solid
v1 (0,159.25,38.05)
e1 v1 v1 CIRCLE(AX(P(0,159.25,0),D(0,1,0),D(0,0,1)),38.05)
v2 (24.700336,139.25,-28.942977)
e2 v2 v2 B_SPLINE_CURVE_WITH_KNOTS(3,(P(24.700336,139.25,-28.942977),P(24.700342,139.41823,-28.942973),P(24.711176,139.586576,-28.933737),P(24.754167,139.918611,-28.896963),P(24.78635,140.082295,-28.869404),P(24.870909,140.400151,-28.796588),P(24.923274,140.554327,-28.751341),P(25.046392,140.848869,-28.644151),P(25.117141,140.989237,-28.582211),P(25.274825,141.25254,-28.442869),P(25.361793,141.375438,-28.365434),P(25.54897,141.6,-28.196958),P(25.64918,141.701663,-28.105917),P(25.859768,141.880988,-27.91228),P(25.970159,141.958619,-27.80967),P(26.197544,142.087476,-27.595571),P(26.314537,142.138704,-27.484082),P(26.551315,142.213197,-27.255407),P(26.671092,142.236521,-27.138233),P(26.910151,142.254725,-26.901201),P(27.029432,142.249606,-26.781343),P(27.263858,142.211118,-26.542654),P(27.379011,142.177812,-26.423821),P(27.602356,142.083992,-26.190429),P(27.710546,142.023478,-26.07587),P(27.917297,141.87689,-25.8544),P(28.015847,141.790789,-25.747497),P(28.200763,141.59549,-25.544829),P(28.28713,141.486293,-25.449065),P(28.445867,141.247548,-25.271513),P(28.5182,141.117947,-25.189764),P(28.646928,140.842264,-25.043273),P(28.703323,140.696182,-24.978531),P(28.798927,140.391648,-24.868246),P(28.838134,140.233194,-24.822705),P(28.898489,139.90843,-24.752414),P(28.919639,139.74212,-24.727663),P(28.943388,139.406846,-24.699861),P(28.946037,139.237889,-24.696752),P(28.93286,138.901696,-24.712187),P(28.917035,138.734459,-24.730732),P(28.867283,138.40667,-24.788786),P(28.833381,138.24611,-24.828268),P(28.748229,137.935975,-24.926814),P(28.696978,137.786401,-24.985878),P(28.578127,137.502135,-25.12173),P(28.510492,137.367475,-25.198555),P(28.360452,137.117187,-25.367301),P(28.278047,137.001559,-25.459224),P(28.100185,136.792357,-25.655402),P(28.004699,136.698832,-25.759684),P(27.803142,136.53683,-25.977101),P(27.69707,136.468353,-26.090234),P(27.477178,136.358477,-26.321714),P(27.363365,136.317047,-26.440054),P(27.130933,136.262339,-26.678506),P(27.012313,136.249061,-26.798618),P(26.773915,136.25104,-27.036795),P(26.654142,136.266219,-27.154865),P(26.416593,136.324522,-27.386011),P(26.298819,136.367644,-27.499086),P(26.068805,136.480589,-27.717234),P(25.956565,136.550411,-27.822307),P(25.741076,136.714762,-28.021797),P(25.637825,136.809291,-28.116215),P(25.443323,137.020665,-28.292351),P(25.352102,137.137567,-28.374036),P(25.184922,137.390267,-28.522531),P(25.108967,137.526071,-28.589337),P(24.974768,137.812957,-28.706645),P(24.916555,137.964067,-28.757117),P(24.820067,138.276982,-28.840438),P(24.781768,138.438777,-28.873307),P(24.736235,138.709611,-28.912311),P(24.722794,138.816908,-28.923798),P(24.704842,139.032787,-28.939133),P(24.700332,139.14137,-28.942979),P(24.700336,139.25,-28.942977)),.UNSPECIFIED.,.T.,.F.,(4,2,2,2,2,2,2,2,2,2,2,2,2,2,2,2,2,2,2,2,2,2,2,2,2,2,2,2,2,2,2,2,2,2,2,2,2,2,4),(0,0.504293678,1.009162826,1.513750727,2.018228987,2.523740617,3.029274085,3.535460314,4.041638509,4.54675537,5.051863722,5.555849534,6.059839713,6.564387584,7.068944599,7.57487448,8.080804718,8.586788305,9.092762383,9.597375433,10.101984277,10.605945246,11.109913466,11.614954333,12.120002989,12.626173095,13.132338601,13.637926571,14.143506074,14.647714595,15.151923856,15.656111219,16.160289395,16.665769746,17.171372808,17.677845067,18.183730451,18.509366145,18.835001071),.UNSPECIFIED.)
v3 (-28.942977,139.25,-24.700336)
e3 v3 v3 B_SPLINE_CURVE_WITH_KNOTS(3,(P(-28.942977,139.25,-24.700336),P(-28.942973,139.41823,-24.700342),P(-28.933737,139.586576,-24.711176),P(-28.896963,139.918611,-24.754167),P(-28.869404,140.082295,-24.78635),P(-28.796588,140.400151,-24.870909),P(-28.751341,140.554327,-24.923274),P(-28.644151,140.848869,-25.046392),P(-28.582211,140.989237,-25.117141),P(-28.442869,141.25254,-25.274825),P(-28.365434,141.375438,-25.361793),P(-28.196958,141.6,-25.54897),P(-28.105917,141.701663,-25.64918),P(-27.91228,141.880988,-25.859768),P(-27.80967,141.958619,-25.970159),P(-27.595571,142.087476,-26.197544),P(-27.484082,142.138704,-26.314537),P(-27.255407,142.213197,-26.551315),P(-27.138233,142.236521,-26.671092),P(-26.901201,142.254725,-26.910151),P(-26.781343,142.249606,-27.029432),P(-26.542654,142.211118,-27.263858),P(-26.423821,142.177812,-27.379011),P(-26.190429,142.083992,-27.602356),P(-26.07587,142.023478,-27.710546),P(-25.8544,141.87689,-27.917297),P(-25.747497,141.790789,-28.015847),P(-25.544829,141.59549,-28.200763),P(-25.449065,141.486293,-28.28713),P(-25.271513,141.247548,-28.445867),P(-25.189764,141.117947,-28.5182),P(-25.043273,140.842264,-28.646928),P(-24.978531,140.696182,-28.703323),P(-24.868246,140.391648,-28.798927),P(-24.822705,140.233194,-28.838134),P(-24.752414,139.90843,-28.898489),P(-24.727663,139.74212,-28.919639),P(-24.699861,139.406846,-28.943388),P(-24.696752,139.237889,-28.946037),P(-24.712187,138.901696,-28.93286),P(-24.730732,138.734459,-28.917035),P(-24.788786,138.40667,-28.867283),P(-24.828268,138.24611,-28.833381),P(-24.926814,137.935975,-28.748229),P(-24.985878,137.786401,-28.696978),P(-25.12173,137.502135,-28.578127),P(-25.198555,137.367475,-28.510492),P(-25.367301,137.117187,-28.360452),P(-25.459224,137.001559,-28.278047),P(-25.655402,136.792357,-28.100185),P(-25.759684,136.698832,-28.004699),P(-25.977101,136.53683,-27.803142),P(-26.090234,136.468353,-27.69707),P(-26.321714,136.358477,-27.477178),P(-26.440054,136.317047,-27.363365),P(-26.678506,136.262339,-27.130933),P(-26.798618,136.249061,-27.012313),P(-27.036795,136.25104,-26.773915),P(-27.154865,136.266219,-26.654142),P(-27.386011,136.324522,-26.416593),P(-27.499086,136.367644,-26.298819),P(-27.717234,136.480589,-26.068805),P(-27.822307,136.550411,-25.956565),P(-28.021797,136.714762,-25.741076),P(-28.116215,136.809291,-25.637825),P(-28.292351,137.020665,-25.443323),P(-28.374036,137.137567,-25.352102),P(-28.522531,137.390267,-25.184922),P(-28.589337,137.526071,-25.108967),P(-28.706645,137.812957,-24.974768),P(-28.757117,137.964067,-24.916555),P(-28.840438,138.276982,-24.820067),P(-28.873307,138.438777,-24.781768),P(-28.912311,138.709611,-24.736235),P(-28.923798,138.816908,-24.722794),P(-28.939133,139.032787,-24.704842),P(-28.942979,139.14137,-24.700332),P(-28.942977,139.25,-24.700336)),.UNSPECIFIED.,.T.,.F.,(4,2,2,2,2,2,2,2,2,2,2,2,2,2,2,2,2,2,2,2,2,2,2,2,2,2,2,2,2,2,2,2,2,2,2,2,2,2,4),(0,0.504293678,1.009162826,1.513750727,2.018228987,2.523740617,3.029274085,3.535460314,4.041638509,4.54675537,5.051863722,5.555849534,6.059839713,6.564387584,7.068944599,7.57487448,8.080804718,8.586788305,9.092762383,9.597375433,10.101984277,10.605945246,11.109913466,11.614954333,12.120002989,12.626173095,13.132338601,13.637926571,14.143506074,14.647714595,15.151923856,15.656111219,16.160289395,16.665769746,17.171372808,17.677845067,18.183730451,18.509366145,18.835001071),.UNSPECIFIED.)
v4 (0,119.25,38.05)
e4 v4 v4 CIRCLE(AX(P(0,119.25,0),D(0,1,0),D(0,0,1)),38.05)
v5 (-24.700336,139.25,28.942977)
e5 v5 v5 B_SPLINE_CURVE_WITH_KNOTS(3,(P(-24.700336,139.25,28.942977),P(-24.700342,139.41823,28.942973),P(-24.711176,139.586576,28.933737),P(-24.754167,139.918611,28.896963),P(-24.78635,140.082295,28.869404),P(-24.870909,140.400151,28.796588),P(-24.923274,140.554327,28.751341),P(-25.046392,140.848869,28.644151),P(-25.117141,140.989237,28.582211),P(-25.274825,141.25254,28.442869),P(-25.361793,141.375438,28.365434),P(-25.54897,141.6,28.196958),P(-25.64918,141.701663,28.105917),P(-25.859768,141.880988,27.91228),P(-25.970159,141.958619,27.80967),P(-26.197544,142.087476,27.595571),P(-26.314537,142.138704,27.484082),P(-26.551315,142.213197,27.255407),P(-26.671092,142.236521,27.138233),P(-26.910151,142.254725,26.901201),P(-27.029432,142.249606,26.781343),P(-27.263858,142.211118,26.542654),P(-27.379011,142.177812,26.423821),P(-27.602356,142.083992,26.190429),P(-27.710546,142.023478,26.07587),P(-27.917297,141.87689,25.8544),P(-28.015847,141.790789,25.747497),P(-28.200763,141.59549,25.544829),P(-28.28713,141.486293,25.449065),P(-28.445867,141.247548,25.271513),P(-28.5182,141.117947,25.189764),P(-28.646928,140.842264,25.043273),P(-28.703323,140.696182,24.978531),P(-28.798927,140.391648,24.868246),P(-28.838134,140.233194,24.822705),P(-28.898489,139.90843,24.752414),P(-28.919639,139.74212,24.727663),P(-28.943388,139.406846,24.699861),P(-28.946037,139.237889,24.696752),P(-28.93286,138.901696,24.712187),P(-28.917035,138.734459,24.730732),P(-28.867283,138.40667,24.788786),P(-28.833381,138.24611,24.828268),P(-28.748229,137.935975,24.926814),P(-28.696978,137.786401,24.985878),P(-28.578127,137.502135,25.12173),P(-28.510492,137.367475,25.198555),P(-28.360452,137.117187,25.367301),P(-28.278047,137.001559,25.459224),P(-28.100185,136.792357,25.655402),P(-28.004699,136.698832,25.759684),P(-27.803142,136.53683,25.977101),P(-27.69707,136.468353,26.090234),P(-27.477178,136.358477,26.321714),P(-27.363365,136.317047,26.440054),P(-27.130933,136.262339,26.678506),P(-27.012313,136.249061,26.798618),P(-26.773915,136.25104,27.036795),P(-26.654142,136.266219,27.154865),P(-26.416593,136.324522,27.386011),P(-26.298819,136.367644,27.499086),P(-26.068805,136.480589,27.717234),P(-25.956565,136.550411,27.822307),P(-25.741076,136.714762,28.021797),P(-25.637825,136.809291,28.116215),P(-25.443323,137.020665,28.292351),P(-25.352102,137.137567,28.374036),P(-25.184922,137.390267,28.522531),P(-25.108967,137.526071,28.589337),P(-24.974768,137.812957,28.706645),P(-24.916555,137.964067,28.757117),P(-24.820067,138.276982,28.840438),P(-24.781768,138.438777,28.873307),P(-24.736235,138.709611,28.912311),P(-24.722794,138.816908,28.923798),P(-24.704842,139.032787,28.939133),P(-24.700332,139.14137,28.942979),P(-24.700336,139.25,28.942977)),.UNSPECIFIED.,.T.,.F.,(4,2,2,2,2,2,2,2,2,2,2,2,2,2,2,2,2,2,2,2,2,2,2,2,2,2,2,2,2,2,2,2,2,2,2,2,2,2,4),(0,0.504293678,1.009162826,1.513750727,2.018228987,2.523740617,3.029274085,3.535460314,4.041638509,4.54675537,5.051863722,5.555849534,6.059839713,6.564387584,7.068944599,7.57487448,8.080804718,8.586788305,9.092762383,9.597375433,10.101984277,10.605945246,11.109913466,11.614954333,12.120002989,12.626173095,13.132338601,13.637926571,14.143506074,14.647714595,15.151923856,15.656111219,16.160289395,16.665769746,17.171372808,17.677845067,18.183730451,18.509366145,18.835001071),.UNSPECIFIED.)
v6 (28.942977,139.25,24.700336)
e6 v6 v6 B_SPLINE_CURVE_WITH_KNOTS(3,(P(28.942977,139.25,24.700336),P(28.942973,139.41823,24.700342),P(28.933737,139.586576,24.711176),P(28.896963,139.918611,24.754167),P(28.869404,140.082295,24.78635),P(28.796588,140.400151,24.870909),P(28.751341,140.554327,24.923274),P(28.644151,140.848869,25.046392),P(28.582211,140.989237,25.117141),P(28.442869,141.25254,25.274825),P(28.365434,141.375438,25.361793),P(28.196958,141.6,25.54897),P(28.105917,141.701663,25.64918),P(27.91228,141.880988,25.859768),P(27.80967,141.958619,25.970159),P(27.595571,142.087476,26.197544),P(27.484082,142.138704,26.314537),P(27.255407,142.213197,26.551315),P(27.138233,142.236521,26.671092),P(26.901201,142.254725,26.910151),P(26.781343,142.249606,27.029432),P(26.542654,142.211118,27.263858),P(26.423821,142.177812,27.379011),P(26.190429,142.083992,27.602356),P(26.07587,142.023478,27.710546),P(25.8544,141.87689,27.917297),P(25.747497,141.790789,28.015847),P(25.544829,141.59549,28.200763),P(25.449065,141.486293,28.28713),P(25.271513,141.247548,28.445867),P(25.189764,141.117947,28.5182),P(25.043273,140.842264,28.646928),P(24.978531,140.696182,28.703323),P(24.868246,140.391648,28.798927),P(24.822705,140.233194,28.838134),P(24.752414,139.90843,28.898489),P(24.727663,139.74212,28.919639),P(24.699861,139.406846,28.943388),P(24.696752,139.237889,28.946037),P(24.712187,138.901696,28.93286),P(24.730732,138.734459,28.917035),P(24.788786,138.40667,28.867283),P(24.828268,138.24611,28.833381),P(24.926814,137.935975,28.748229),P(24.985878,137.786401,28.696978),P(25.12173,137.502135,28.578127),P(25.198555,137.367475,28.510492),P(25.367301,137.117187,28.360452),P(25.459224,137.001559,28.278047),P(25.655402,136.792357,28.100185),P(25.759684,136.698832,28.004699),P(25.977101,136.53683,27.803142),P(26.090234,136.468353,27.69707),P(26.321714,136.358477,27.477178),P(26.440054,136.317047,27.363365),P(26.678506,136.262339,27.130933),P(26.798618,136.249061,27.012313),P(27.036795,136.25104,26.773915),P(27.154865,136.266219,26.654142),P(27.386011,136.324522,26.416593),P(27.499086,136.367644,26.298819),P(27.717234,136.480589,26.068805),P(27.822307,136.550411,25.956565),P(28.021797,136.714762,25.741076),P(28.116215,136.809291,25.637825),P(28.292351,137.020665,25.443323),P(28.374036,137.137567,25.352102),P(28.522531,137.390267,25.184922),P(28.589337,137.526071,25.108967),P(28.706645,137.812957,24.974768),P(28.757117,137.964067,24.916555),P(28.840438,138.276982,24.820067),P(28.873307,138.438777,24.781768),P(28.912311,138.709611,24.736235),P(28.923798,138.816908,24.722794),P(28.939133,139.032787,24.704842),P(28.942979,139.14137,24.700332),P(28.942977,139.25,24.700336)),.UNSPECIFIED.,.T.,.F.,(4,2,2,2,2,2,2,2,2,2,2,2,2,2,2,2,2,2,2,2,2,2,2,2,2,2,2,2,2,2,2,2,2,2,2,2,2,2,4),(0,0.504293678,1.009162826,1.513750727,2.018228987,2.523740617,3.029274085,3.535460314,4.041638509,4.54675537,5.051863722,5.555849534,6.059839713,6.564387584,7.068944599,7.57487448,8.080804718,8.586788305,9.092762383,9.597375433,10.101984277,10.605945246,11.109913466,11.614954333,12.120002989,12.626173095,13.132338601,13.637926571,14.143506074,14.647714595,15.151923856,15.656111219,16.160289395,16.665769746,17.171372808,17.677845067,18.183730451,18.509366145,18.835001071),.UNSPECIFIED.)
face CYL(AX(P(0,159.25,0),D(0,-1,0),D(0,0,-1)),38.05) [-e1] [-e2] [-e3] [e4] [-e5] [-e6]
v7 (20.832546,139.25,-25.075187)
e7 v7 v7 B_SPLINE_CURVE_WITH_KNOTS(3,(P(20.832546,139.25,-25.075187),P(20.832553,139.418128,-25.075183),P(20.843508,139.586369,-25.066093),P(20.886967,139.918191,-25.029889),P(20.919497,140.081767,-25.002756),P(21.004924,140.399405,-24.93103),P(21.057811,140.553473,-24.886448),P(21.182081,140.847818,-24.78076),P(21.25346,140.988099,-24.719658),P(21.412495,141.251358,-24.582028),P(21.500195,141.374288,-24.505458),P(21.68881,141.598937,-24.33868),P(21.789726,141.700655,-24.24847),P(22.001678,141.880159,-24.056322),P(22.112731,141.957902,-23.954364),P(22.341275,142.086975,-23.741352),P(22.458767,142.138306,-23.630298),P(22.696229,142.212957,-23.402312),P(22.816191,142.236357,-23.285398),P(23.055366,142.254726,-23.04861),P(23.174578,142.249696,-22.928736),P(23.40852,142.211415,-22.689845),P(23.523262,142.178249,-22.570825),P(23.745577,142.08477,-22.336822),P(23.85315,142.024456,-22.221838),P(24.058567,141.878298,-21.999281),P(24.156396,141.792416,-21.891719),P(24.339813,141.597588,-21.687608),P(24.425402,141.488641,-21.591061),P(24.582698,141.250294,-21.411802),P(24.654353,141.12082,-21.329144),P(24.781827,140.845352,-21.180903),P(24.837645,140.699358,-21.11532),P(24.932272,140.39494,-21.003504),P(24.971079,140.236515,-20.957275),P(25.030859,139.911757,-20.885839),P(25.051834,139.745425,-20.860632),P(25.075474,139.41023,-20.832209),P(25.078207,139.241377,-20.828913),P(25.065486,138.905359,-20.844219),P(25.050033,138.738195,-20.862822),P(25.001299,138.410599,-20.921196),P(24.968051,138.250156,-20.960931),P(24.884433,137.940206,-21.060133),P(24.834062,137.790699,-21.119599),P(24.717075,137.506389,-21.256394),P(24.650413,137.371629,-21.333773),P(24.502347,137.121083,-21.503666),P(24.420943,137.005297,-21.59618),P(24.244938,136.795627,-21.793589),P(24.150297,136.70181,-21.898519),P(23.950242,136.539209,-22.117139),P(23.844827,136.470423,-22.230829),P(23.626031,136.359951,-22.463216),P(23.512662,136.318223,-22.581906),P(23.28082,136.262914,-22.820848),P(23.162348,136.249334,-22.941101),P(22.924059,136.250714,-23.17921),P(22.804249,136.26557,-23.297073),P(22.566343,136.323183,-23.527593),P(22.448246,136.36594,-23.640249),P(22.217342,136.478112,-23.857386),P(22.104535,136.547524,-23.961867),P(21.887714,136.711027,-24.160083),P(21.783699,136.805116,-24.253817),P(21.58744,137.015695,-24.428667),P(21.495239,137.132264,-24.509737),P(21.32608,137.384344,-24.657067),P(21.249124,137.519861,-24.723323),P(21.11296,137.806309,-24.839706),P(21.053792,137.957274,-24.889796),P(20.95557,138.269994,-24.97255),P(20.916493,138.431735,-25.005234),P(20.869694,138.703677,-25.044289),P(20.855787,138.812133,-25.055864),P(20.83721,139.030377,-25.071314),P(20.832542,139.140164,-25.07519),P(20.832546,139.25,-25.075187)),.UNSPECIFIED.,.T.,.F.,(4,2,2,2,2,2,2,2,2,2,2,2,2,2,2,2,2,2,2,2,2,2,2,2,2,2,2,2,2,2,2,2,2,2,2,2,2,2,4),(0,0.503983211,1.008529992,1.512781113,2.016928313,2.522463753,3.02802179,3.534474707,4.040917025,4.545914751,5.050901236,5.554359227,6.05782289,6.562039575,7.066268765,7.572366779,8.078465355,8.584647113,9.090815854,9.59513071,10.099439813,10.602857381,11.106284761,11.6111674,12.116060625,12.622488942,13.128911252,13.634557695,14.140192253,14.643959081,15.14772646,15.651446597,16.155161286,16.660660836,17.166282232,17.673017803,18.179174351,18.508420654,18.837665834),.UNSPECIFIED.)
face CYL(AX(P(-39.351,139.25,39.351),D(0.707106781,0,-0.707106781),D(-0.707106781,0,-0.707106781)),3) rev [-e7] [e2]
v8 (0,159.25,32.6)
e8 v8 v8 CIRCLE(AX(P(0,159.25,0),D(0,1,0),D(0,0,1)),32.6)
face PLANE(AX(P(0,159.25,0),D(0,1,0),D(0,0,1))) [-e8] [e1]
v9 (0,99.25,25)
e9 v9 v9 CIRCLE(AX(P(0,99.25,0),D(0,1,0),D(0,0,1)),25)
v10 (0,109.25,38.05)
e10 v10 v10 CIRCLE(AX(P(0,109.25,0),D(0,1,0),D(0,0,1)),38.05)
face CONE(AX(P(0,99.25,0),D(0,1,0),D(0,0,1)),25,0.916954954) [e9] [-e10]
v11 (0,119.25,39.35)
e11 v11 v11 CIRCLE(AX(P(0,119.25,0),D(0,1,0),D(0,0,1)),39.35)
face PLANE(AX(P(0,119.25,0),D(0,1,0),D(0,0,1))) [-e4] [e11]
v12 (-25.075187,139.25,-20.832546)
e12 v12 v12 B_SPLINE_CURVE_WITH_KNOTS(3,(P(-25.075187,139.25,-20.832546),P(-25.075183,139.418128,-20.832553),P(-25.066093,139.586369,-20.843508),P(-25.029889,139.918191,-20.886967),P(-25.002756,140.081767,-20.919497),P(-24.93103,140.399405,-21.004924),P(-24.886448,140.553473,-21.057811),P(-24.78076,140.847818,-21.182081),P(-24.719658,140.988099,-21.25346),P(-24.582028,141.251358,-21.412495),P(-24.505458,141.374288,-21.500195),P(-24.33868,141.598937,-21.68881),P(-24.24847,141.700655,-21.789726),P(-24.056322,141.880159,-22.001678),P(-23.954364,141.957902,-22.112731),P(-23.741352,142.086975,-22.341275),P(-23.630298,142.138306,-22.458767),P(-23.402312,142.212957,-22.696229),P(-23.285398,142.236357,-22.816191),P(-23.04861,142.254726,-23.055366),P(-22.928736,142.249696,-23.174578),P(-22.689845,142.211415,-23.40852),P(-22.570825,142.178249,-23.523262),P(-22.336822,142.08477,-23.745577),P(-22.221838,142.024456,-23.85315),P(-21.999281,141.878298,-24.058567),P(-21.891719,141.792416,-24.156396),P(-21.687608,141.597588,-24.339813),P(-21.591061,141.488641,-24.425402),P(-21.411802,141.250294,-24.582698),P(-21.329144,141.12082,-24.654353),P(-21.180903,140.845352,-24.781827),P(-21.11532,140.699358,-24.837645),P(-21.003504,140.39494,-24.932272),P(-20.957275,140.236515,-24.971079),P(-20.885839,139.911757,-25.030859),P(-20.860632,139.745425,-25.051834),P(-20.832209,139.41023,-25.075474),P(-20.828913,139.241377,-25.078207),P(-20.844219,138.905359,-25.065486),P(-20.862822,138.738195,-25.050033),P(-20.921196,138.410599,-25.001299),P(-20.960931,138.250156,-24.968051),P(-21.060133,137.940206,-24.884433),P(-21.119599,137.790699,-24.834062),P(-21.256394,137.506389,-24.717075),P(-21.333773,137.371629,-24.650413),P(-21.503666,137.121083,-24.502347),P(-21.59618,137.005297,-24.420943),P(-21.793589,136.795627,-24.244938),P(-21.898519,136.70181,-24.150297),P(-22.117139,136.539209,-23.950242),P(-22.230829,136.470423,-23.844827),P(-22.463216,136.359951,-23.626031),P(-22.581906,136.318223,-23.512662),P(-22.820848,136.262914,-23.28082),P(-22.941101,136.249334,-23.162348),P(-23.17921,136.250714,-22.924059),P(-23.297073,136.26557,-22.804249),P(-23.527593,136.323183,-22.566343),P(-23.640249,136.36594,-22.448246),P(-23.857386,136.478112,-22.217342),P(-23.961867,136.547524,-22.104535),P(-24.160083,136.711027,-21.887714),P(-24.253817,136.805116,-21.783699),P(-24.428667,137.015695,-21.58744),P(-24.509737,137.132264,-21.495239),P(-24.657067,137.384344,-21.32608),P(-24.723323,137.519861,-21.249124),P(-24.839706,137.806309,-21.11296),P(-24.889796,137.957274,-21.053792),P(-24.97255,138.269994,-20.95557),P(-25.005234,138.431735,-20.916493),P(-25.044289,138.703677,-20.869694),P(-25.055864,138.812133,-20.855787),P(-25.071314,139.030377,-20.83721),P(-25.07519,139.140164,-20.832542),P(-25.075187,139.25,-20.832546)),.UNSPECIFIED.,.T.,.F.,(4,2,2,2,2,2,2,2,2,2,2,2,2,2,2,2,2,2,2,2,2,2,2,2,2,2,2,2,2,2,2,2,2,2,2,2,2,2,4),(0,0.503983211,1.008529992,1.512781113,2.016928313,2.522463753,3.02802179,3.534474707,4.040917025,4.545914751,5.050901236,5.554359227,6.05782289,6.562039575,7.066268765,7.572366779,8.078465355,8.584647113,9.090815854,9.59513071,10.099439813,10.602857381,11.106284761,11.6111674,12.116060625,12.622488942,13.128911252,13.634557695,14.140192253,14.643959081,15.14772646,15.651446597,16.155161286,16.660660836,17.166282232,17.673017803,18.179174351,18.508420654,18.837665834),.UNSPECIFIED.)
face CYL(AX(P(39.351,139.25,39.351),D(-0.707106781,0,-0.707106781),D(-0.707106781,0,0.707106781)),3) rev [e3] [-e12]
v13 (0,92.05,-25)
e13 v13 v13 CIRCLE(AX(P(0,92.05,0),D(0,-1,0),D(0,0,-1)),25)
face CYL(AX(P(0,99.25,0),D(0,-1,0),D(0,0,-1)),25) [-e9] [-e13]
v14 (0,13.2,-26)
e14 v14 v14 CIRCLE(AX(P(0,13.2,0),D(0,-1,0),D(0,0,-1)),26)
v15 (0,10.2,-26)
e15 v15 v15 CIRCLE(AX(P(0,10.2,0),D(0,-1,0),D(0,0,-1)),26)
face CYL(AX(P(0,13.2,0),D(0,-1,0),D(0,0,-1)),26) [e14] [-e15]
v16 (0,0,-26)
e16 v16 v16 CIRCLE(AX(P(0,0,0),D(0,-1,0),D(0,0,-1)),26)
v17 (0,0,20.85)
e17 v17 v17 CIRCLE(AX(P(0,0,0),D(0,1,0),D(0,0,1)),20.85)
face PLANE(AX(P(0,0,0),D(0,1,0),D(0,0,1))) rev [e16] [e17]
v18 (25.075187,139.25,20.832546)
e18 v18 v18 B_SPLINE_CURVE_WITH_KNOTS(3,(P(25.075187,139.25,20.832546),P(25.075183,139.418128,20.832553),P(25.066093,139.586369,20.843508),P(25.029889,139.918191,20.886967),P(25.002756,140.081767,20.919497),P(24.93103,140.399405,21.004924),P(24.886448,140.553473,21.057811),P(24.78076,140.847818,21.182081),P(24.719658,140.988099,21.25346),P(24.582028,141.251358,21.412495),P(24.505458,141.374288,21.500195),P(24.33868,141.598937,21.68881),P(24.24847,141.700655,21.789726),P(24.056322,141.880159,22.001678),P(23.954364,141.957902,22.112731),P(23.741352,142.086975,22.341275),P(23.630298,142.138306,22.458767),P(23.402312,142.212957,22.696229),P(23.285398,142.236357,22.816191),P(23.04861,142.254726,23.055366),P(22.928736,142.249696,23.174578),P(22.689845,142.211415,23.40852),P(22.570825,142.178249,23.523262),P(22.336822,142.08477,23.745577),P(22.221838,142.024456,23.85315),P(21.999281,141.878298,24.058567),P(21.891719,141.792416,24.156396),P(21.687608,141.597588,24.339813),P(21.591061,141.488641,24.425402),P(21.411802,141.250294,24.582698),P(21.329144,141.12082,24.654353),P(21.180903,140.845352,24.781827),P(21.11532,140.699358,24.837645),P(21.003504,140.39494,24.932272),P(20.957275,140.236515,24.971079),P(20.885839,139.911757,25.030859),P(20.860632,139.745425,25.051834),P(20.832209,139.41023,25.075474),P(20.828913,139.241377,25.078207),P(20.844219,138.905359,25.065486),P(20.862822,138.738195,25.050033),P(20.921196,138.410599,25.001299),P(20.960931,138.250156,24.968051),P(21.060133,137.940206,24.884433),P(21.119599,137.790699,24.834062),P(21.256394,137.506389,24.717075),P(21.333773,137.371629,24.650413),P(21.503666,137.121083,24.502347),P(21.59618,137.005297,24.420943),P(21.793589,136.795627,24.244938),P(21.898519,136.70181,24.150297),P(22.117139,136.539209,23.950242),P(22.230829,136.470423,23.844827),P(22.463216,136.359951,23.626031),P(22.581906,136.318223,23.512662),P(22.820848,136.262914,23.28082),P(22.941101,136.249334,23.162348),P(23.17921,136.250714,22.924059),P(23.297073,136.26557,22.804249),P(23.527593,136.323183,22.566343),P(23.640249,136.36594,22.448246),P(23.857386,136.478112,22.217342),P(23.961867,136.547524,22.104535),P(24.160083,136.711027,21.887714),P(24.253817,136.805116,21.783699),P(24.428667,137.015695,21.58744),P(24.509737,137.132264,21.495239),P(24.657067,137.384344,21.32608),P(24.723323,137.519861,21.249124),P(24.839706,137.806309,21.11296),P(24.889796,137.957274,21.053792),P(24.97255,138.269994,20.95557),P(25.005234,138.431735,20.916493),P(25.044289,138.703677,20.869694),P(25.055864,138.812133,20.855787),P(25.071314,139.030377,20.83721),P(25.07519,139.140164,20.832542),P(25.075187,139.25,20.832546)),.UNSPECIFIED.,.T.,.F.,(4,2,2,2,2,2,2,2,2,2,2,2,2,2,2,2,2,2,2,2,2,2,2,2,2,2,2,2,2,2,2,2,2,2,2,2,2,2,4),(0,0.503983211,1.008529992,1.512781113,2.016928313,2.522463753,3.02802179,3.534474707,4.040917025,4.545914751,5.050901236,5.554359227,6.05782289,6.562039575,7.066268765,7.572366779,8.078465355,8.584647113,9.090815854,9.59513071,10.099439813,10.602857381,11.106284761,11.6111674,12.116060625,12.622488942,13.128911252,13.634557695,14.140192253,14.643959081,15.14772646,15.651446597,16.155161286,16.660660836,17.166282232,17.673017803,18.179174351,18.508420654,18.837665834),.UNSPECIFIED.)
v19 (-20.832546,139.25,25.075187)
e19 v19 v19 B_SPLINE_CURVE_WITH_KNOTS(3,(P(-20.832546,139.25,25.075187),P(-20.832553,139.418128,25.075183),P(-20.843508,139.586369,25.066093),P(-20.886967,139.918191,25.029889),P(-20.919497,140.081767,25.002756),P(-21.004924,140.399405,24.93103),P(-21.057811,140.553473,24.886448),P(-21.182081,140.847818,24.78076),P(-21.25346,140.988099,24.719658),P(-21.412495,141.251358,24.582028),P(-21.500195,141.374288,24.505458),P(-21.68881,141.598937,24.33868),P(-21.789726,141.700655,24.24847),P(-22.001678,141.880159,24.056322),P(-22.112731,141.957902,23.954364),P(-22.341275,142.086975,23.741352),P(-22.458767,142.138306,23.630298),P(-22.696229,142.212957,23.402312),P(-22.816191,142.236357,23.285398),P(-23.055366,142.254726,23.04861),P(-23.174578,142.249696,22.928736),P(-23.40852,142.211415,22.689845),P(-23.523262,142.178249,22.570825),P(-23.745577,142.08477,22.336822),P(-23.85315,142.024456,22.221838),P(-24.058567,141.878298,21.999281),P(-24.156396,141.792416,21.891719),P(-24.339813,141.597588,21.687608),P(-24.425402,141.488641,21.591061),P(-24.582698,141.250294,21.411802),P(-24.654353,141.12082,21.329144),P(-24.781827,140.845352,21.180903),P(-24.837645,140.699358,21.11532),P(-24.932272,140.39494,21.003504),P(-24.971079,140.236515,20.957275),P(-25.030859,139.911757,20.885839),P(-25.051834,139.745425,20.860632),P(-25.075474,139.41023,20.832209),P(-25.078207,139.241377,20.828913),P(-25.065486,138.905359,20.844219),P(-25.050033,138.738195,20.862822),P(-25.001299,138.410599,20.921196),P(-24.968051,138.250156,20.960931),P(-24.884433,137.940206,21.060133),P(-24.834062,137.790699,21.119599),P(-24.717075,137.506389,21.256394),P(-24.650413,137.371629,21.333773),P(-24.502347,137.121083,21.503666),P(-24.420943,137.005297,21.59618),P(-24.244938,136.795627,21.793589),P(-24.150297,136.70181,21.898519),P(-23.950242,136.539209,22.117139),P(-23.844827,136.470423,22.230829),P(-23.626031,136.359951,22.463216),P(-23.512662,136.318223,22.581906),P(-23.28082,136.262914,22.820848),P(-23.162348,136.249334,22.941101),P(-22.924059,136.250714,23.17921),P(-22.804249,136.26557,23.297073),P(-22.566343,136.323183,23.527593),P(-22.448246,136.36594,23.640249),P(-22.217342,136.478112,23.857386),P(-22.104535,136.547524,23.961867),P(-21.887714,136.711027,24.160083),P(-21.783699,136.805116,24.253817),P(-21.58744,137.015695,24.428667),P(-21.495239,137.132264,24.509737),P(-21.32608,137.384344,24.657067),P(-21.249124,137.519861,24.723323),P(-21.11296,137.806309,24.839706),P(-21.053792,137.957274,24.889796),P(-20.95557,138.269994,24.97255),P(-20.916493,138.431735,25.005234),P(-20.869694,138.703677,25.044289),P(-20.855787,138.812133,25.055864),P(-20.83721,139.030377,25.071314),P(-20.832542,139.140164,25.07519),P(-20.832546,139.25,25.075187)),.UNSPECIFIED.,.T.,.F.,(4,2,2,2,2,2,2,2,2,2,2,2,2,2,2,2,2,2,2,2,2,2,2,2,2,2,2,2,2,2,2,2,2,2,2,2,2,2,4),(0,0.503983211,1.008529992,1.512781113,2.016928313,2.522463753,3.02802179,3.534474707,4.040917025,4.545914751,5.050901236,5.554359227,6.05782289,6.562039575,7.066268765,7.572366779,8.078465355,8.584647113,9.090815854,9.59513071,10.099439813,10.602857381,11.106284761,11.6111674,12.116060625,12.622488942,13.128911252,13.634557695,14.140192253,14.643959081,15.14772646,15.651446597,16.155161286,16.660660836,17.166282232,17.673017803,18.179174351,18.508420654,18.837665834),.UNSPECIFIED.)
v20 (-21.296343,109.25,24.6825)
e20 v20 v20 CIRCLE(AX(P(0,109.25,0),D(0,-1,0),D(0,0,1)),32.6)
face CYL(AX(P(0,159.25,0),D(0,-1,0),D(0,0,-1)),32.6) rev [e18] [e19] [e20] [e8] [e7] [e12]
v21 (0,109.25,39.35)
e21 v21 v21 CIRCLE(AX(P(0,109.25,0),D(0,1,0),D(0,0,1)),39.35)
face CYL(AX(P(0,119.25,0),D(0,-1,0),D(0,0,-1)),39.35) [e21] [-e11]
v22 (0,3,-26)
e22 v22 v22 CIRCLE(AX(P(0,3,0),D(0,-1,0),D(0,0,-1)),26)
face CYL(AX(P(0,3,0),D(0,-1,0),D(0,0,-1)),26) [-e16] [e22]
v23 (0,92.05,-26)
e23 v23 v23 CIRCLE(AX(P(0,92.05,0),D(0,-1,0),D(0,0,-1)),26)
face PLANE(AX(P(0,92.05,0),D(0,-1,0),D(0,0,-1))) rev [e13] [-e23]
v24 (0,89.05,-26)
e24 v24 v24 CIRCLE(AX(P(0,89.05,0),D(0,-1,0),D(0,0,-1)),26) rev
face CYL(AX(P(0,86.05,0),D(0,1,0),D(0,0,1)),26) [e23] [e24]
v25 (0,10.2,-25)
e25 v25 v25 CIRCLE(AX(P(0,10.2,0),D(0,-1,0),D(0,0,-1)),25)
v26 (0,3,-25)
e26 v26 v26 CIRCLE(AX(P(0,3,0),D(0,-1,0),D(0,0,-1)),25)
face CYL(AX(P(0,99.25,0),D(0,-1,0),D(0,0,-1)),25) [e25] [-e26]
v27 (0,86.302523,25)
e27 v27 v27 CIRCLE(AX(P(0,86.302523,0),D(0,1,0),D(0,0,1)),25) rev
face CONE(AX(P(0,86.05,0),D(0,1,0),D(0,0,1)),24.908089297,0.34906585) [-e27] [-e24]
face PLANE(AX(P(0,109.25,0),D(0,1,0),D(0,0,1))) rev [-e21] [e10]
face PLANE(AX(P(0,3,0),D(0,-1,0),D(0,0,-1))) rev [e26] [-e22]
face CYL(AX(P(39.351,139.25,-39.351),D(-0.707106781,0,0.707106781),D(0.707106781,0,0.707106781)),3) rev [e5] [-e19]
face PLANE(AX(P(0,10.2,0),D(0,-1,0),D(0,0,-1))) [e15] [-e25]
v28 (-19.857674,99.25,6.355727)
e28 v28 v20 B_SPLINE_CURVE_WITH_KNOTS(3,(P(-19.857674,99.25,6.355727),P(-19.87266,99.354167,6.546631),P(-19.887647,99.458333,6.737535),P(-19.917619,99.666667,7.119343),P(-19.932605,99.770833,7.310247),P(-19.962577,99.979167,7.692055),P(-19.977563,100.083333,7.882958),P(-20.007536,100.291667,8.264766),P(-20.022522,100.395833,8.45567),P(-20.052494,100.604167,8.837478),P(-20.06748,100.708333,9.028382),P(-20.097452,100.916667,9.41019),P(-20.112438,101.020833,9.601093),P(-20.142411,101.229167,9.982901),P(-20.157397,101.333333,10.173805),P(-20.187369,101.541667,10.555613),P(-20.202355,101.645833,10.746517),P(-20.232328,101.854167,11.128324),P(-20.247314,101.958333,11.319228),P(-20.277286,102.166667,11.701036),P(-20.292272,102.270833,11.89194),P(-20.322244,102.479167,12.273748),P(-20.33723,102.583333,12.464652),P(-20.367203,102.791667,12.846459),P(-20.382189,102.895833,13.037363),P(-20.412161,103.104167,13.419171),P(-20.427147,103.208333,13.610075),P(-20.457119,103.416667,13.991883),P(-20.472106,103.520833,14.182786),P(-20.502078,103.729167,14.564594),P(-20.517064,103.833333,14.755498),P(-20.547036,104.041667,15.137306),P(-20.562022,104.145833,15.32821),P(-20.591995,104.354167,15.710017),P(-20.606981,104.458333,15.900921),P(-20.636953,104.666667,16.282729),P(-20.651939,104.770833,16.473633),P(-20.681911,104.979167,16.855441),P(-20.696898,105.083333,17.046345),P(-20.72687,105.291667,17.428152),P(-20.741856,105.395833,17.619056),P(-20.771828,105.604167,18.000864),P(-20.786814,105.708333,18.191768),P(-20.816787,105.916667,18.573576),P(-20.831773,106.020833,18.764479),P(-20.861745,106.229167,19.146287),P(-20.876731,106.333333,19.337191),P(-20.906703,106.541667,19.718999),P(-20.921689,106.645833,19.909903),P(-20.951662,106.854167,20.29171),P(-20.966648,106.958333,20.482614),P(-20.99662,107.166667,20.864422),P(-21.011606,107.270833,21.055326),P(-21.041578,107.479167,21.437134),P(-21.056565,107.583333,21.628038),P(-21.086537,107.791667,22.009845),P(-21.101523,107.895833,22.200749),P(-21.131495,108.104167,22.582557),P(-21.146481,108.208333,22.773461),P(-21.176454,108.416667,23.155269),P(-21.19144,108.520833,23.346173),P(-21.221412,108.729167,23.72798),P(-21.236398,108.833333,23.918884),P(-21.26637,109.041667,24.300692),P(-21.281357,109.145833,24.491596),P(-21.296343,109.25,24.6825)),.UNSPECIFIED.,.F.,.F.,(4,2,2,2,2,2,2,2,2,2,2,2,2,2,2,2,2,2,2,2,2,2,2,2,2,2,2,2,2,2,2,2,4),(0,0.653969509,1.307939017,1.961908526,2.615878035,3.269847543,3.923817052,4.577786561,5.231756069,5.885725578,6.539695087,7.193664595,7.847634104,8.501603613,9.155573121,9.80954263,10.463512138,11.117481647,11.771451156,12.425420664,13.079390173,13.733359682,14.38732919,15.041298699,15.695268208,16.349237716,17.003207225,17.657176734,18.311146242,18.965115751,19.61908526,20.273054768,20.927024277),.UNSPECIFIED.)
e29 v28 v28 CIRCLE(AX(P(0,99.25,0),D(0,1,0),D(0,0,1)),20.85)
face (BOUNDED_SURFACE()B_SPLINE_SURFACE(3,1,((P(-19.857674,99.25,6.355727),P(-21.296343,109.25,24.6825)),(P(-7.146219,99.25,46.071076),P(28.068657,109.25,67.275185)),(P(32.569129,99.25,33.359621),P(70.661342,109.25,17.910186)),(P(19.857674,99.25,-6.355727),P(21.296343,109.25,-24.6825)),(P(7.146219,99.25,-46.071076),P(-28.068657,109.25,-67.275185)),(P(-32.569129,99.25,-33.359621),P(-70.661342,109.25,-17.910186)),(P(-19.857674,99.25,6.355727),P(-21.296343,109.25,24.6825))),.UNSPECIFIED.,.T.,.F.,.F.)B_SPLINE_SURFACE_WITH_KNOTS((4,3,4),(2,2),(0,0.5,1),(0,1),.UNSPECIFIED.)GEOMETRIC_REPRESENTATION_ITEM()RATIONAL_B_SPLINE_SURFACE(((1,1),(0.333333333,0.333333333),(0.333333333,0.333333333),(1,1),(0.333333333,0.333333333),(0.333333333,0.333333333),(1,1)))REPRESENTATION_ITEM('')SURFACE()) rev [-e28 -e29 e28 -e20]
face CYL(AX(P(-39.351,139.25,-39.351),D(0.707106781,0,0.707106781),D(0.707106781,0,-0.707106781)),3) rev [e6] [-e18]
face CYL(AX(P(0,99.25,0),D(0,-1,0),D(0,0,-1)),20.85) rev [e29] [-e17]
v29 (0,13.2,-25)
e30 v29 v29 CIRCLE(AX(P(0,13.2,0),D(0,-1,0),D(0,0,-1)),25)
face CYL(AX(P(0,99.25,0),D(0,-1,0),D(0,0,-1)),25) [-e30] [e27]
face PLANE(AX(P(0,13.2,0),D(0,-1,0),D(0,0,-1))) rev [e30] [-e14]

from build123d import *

# Parameters (mm, degrees)
SKETCH2_R                 = 25
SKETCH2_R_2               = 20.85
BOSS_EXTRUDE1_DEPTH       = 99.25
BOSS_EXTRUDE2_START       = 10
SKETCH3_R                 = 38.05
SKETCH3_R_2               = 32.6
BOSS_EXTRUDE2_DEPTH       = 50
BOSS_EXTRUDE3_START       = -50
BOSS_EXTRUDE3_OUTLINE_R   = 39.35
BOSS_EXTRUDE3_OUTLINE_R_2 = 38.05
BOSS_EXTRUDE3_DEPTH       = 10
CUT_EXTRUDE1_REACH        = 186.77
CUT_EXTRUDE1_END_RADIUS   = 32.6
SKETCH7_R                 = 3
CIRPATTERN1_COUNT         = 4
SKETCH8_R                 = 26
SKETCH8_R_2               = 25
BOSS_EXTRUDE5_DEPTH       = 3
BOSS_EXTRUDE6_START       = -92.05
BOSS_EXTRUDE6_OUTLINE_R   = 26
BOSS_EXTRUDE6_OUTLINE_R_2 = 25
BOSS_EXTRUDE6_DEPTH       = 6
CHAMFER1_SIZE             = 1.091910703
CHAMFER1_SIZE_2           = 3
BOSS_EXTRUDE7_START       = -10.2
SKETCH10_R                = 26
SKETCH10_R_2              = 25
BOSS_EXTRUDE7_DEPTH       = 3


with BuildPart() as part:
    # Sketch2 → Boss-Extrude1 (new body)
    with BuildSketch(Plane(origin=(0, 0, 0), x_dir=(1, 0, 0), z_dir=(0, 1, 0))):
        with Locations(Location((0, 0, 0), (0, 0, 270))):
            Circle(SKETCH2_R)
        with Locations(Location((0, 0, 0), (0, 0, 270))):
            Circle(SKETCH2_R_2, mode=Mode.SUBTRACT)
    extrude(amount=BOSS_EXTRUDE1_DEPTH)



with BuildPart() as body_2:
    # Sketch3 → Boss-Extrude2 (new body)
    with BuildSketch(Plane(origin=(0, 99.25, 0), x_dir=(1, 0, 0), z_dir=(0, 1, 0)).offset(BOSS_EXTRUDE2_START)):
        with Locations(Location((0, 0, 0), (0, 0, 270))):
            Circle(SKETCH3_R)
        with Locations(Location((0, 0, 0), (0, 0, 270))):
            Circle(SKETCH3_R_2, mode=Mode.SUBTRACT)
    extrude(amount=BOSS_EXTRUDE2_DEPTH)


with BuildPart() as part_1:
    add(part.part)

    add(body_2.part)  # loft3 joins it to this body
    # loft up to a face of the part (loft3)
    loft([Face(Wire([part_1.edges().sort_by_distance((18.224215686, 99.25, -17.113677648))[0]])), Face(Wire([part_1.edges().sort_by_distance((-27.737256273, 109.25, -26.047017381))[0]]))])

    # Cut-Loft1: read off the stored shape, not the designer's step
    # Cut-Loft1: loft between two sections, ruled curve by curve
    cut_loft1_from = [
        Edge.make_bspline([(-19.857674291, 99.25, 6.355727475), (-7.146219341, 99.25, 46.071076058), (32.569129241, 99.25, 33.359621108), (19.857674291, 99.25, -6.355727475), (7.146219341, 99.25, -46.071076058), (-32.569129241, 99.25, -33.359621108), (-19.857674291, 99.25, 6.355727475)], [0, 0, 0, 0, 0.5, 0.5, 0.5, 1, 1, 1, 1], 3, [1, 0.333333333, 0.333333333, 1, 0.333333333, 0.333333333, 1]),
    ]
    cut_loft1_to = [
        Edge.make_bspline([(-21.296342667, 109.25, 24.682499651), (28.068656636, 109.25, 67.275184984), (70.661341969, 109.25, 17.910185682), (21.296342667, 109.25, -24.682499651), (-28.068656636, 109.25, -67.275184984), (-70.661341969, 109.25, -17.910185682), (-21.296342667, 109.25, 24.682499651)], [0, 0, 0, 0, 0.5, 0.5, 0.5, 1, 1, 1, 1], 3, [1, 0.333333333, 0.333333333, 1, 0.333333333, 0.333333333, 1]),
    ]
    cut_loft1 = Solid(Shell([*[Face.make_surface_from_curves(cut_loft1_from[k], cut_loft1_to[k]) for k in range(1)], Face(Wire(cut_loft1_from)), Face(Wire(cut_loft1_to))]))
    add(cut_loft1, mode=Mode.SUBTRACT)

    # Boss-Extrude3: read off the stored shape, not the designer's step
    # Boss-Extrude3 outline → Boss-Extrude3 (add)
    with BuildSketch(Plane(origin=(0, 159.25, 0), x_dir=(1, 0, 0), z_dir=(0, 1, 0)).offset(BOSS_EXTRUDE3_START)):
        Circle(BOSS_EXTRUDE3_OUTLINE_R)
        Circle(BOSS_EXTRUDE3_OUTLINE_R_2, mode=Mode.SUBTRACT)
    extrude(amount=BOSS_EXTRUDE3_DEPTH)

    # Cut-Extrude1: up to this cylinder (the profile starts outside it)
    cut_extrude1_end = Plane(origin=(0, 139.25, 0), z_dir=(0, -1, 0)) * Cylinder(CUT_EXTRUDE1_END_RADIUS, 439.74, mode=Mode.PRIVATE)
    # Sketch7 → Cut-Extrude1 (cut, up to the surface)
    with BuildSketch(Plane(origin=(-26.905413024, 0, 26.905413024), x_dir=(0, -1, 0), z_dir=(-0.7071067811865488, 0, 0.7071067811865464)), mode=Mode.PRIVATE) as cut_extrude1_sk1:
        with Locations(Location((-139.25, 0, 0), (0, 0, 90))):
            Circle(SKETCH7_R)
    cut_extrude1_tool1 = extrude(cut_extrude1_sk1.sketch, amount=-CUT_EXTRUDE1_REACH, mode=Mode.PRIVATE) - cut_extrude1_end
    cut_extrude1 = cut_extrude1_tool1.solids().sort_by_distance((-26.905413, 139.25, 26.905413))[0]
    add(cut_extrude1, mode=Mode.SUBTRACT)

    # CirPattern1: Cut-Extrude1 ×4 about axis
    cirpattern1_axis = Axis((0, 159.25, 0), (0, -1, 0))
    for i in range(1, CIRPATTERN1_COUNT):
        add(cut_extrude1.rotate(cirpattern1_axis, i * 360 / CIRPATTERN1_COUNT), mode=Mode.SUBTRACT)

    # Sketch8 → Boss-Extrude5 (add)
    with BuildSketch(Plane.XZ):
        with Locations(Location((0, 0, 0), (0, 0, 270))):
            Circle(SKETCH8_R)
        with Locations(Location((0, 0, 0), (0, 0, 270))):
            Circle(SKETCH8_R_2, mode=Mode.SUBTRACT)
    extrude(amount=-BOSS_EXTRUDE5_DEPTH)

    # Boss-Extrude6: read off the stored shape, not the designer's step
    # Boss-Extrude6 outline → Boss-Extrude6 (add)
    with BuildSketch(Plane.XZ.offset(BOSS_EXTRUDE6_START)):
        Circle(BOSS_EXTRUDE6_OUTLINE_R)
        Circle(BOSS_EXTRUDE6_OUTLINE_R_2, mode=Mode.SUBTRACT)
    extrude(amount=BOSS_EXTRUDE6_DEPTH)

    # Chamfer1
    # the kernel refuses this chamfer: 3, 1.091910703 mm, written as the material it takes off along each edge
    with BuildSketch(Plane(origin=(0, 86.05, 0), x_dir=(1, 0, 0), z_dir=(0, 0, -1))) as chamfer1_piece_1_section:
        Polygon((26 - CHAMFER1_SIZE, 0), (26, -CHAMFER1_SIZE_2), (26, 0), align=None)
    chamfer1_piece_1 = revolve(axis=Axis((0, 86.05, 0), (0, -1, 0)), mode=Mode.PRIVATE)
    chamfer1_piece_1 = chamfer1_piece_1 - Plane(origin=(0, 86.05, 0), x_dir=(0, 0, 1), z_dir=(0, -1, 0)) * Cylinder(25, 104, mode=Mode.PRIVATE)
    add(chamfer1_piece_1, mode=Mode.SUBTRACT)

    # Sketch10 → Boss-Extrude7 (add)
    with BuildSketch(Plane.XZ.offset(BOSS_EXTRUDE7_START)):
        with Locations(Location((0, 0, 0), (0, 0, 270))):
            Circle(SKETCH10_R)
        with Locations(Location((0, 0, 0), (0, 0, 270))):
            Circle(SKETCH10_R_2, mode=Mode.SUBTRACT)
    extrude(amount=-BOSS_EXTRUDE7_DEPTH)


solid = part_1.part
